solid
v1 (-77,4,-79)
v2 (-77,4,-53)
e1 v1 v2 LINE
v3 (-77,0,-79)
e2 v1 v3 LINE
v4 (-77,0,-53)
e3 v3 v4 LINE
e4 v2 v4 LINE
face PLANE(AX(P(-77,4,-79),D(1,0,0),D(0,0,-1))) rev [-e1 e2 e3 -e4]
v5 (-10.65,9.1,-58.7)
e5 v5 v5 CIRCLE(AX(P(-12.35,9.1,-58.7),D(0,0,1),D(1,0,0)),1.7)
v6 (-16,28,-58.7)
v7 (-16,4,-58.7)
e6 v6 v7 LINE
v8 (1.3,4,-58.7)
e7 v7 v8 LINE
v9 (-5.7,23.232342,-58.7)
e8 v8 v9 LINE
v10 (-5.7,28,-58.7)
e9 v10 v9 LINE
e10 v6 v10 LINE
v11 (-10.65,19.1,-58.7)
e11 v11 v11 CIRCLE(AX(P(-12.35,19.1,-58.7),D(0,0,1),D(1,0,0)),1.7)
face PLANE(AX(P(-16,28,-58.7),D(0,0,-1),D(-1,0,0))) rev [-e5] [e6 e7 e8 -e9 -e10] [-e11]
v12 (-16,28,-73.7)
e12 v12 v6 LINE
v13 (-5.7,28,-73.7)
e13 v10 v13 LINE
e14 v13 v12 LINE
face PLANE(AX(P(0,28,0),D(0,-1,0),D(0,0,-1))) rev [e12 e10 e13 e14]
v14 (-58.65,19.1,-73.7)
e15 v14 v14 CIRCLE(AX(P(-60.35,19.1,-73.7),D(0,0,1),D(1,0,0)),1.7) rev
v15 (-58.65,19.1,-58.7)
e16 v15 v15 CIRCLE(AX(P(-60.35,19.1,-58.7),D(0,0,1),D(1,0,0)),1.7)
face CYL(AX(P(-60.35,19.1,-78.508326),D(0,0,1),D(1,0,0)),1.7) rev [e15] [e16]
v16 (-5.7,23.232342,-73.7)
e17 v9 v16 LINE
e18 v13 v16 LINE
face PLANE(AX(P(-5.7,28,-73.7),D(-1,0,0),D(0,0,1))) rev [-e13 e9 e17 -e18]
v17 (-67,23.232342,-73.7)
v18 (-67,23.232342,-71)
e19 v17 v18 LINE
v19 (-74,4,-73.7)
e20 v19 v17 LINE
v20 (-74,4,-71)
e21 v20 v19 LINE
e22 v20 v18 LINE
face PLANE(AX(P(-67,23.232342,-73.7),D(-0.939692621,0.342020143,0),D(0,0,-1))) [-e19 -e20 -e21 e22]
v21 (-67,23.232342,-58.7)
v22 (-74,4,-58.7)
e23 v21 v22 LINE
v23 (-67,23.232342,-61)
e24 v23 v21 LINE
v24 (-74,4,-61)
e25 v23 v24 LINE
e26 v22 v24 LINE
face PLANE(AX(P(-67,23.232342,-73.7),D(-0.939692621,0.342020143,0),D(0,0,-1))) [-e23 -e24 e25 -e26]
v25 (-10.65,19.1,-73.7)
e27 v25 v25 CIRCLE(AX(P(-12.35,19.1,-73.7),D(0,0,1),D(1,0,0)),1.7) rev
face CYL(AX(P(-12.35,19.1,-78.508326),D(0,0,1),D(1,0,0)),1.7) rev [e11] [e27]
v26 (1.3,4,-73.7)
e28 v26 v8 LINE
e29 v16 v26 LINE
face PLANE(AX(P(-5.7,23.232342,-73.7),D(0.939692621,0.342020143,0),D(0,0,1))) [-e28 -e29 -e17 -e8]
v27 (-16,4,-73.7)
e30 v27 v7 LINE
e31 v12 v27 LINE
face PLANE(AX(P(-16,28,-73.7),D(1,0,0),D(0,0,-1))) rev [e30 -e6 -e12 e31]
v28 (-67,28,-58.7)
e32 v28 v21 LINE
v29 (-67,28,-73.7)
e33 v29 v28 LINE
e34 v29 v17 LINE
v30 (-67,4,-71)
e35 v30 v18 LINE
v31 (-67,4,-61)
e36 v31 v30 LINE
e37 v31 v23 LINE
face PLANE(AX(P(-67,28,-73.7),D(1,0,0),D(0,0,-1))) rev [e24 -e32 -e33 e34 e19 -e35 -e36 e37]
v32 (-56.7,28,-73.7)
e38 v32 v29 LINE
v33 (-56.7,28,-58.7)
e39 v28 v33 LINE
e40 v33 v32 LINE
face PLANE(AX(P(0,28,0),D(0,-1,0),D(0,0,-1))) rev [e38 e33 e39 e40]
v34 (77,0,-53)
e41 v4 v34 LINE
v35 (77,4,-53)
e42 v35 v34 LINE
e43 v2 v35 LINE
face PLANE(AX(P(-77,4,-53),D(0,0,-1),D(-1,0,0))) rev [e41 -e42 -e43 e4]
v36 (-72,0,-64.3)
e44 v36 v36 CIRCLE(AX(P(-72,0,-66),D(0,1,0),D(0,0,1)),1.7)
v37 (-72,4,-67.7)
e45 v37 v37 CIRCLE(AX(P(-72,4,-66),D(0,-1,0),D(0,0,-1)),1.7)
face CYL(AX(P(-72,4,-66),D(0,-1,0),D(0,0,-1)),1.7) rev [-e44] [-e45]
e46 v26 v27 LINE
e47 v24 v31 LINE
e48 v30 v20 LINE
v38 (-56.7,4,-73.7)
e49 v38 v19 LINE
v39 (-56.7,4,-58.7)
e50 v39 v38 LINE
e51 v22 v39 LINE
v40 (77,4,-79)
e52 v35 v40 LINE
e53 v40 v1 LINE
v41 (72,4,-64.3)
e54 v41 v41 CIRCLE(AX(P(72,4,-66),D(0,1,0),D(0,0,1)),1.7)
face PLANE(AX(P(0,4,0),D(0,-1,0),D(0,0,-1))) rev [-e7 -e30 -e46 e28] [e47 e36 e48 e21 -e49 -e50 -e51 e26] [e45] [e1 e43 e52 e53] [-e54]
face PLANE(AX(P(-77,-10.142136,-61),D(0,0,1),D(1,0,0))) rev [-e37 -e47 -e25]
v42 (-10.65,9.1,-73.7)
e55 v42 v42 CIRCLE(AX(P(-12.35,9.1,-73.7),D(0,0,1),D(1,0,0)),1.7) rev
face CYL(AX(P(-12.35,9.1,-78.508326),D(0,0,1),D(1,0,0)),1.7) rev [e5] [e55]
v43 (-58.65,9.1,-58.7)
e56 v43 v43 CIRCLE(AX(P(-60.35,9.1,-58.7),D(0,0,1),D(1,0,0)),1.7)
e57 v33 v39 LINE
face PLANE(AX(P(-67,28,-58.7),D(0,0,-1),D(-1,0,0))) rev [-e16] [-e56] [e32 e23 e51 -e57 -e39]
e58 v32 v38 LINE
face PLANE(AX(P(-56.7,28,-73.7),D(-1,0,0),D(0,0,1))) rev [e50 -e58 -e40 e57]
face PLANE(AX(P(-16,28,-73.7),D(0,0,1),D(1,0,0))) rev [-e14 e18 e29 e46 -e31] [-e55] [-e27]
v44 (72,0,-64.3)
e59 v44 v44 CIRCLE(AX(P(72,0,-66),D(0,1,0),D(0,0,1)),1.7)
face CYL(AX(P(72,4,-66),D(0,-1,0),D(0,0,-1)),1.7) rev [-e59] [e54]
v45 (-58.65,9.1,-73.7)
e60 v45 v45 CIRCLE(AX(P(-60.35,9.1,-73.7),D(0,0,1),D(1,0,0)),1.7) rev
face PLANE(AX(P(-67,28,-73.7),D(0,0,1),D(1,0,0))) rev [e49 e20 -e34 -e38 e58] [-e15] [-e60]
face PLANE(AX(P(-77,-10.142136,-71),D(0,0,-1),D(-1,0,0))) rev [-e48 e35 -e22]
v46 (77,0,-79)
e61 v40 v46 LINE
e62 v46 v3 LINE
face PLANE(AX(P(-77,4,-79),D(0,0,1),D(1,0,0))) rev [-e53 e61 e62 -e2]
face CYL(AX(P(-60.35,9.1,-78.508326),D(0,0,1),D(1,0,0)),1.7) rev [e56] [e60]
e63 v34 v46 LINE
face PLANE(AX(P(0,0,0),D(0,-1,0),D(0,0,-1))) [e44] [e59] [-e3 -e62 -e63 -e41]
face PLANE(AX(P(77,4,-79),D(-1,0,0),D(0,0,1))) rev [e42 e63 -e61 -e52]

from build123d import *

# Parameters (mm, degrees)
SKETCH1_W           = 154
SKETCH1_H           = 26
SKETCH1_R           = 1.7
BOSS_EXTRUDE1_DEPTH = 4
SKETCH3_W           = 10.3
SKETCH3_H           = 15
BOSS_EXTRUDE2_DEPTH = 24
CHAMFER2_SIZE       = 7
CHAMFER2_SIZE2      = 19.232341936
CHAMFER3_SIZE       = 7
CHAMFER3_SIZE_2     = 19.232341936
SKETCH4_W           = 10
SKETCH4_H           = 10
CUT_EXTRUDE1_DEPTH  = 24
SKETCH6_R           = 1.7
CUT_EXTRUDE2_DEPTH  = 15


with BuildPart() as part:
    # Sketch1 → Boss-Extrude1 (new body)
    with BuildSketch(Plane(origin=(0, 0, 0), x_dir=(1, 0, 0), z_dir=(0, 1, 0))):
        with Locations((0, 66)):
            Rectangle(SKETCH1_W, SKETCH1_H)
        with Locations(Location((72, 66, 0), (0, 0, 270))):
            Circle(SKETCH1_R, mode=Mode.SUBTRACT)
        with Locations(Location((-72, 66, 0), (0, 0, 270))):
            Circle(SKETCH1_R, mode=Mode.SUBTRACT)
    extrude(amount=BOSS_EXTRUDE1_DEPTH)

    # Sketch3 → Boss-Extrude2 (add)
    with BuildSketch(Plane(origin=(0, 4, 0), x_dir=(1, 0, 0), z_dir=(0, 1, 0))):
        with Locations((-61.85, 66.2)):
            Rectangle(SKETCH3_W, SKETCH3_H)
        with Locations((-10.85, 66.2)):
            Rectangle(SKETCH3_W, SKETCH3_H)
    extrude(amount=BOSS_EXTRUDE2_DEPTH)

    # Chamfer2
    chamfer2_edges = [part.edges().sort_by_distance(p)[0] for p in [
        (-5.7, 4, -66.2),
    ]]
    chamfer2_side = [part.faces().sort_by_distance(p)[0] for p in [
        (3.054836525, 4, -65.983192096),
    ]]
    chamfer(chamfer2_edges, length=CHAMFER2_SIZE, length2=CHAMFER2_SIZE2, reference=chamfer2_side[0])

    # Chamfer3
    # the kernel refuses this chamfer: 19.232341936, 7 mm, written as the material it adds along each edge
    with BuildSketch(Plane(origin=(-67, 4, -73.7), x_dir=(-0.9950833631817486, -0.09904090225205066, 0), z_dir=(0, 0, 1))) as chamfer3_piece_1_section:
        Polygon((CHAMFER3_SIZE * 0.995083363182, -CHAMFER3_SIZE * 0.0990409022521), (-CHAMFER3_SIZE_2 * 0.099040902253, -CHAMFER3_SIZE_2 * 0.995083363191), (0, 0), align=None)
    chamfer3_piece_1 = extrude(amount=15, mode=Mode.PRIVATE)
    chamfer3_piece_1 = chamfer3_piece_1 - Plane(origin=(-72, 10.759738183, -66), x_dir=(0, 0, 1), z_dir=(0, -1, 0)) * Cylinder(1.7, 107, mode=Mode.PRIVATE)
    add(chamfer3_piece_1)

    # Sketch4 → Cut-Extrude1 (cut)
    with BuildSketch(Plane(origin=(0, 28, 0), x_dir=(1, 0, 0), z_dir=(0, 1, 0))):
        with Locations((-72, 66)):
            Rectangle(SKETCH4_W, SKETCH4_H)
    extrude(amount=-CUT_EXTRUDE1_DEPTH, mode=Mode.SUBTRACT)

    # Sketch6 → Cut-Extrude2 (cut)
    with BuildSketch(Plane.XY.offset(-58.7)):
        with Locations((-60.35, 9.1)):
            Circle(SKETCH6_R)
        with Locations((-60.35, 19.1)):
            Circle(SKETCH6_R)
        with Locations((-12.35, 9.1)):
            Circle(SKETCH6_R)
        with Locations((-12.35, 19.1)):
            Circle(SKETCH6_R)
    extrude(amount=-CUT_EXTRUDE2_DEPTH, mode=Mode.SUBTRACT)


solid = part.part
